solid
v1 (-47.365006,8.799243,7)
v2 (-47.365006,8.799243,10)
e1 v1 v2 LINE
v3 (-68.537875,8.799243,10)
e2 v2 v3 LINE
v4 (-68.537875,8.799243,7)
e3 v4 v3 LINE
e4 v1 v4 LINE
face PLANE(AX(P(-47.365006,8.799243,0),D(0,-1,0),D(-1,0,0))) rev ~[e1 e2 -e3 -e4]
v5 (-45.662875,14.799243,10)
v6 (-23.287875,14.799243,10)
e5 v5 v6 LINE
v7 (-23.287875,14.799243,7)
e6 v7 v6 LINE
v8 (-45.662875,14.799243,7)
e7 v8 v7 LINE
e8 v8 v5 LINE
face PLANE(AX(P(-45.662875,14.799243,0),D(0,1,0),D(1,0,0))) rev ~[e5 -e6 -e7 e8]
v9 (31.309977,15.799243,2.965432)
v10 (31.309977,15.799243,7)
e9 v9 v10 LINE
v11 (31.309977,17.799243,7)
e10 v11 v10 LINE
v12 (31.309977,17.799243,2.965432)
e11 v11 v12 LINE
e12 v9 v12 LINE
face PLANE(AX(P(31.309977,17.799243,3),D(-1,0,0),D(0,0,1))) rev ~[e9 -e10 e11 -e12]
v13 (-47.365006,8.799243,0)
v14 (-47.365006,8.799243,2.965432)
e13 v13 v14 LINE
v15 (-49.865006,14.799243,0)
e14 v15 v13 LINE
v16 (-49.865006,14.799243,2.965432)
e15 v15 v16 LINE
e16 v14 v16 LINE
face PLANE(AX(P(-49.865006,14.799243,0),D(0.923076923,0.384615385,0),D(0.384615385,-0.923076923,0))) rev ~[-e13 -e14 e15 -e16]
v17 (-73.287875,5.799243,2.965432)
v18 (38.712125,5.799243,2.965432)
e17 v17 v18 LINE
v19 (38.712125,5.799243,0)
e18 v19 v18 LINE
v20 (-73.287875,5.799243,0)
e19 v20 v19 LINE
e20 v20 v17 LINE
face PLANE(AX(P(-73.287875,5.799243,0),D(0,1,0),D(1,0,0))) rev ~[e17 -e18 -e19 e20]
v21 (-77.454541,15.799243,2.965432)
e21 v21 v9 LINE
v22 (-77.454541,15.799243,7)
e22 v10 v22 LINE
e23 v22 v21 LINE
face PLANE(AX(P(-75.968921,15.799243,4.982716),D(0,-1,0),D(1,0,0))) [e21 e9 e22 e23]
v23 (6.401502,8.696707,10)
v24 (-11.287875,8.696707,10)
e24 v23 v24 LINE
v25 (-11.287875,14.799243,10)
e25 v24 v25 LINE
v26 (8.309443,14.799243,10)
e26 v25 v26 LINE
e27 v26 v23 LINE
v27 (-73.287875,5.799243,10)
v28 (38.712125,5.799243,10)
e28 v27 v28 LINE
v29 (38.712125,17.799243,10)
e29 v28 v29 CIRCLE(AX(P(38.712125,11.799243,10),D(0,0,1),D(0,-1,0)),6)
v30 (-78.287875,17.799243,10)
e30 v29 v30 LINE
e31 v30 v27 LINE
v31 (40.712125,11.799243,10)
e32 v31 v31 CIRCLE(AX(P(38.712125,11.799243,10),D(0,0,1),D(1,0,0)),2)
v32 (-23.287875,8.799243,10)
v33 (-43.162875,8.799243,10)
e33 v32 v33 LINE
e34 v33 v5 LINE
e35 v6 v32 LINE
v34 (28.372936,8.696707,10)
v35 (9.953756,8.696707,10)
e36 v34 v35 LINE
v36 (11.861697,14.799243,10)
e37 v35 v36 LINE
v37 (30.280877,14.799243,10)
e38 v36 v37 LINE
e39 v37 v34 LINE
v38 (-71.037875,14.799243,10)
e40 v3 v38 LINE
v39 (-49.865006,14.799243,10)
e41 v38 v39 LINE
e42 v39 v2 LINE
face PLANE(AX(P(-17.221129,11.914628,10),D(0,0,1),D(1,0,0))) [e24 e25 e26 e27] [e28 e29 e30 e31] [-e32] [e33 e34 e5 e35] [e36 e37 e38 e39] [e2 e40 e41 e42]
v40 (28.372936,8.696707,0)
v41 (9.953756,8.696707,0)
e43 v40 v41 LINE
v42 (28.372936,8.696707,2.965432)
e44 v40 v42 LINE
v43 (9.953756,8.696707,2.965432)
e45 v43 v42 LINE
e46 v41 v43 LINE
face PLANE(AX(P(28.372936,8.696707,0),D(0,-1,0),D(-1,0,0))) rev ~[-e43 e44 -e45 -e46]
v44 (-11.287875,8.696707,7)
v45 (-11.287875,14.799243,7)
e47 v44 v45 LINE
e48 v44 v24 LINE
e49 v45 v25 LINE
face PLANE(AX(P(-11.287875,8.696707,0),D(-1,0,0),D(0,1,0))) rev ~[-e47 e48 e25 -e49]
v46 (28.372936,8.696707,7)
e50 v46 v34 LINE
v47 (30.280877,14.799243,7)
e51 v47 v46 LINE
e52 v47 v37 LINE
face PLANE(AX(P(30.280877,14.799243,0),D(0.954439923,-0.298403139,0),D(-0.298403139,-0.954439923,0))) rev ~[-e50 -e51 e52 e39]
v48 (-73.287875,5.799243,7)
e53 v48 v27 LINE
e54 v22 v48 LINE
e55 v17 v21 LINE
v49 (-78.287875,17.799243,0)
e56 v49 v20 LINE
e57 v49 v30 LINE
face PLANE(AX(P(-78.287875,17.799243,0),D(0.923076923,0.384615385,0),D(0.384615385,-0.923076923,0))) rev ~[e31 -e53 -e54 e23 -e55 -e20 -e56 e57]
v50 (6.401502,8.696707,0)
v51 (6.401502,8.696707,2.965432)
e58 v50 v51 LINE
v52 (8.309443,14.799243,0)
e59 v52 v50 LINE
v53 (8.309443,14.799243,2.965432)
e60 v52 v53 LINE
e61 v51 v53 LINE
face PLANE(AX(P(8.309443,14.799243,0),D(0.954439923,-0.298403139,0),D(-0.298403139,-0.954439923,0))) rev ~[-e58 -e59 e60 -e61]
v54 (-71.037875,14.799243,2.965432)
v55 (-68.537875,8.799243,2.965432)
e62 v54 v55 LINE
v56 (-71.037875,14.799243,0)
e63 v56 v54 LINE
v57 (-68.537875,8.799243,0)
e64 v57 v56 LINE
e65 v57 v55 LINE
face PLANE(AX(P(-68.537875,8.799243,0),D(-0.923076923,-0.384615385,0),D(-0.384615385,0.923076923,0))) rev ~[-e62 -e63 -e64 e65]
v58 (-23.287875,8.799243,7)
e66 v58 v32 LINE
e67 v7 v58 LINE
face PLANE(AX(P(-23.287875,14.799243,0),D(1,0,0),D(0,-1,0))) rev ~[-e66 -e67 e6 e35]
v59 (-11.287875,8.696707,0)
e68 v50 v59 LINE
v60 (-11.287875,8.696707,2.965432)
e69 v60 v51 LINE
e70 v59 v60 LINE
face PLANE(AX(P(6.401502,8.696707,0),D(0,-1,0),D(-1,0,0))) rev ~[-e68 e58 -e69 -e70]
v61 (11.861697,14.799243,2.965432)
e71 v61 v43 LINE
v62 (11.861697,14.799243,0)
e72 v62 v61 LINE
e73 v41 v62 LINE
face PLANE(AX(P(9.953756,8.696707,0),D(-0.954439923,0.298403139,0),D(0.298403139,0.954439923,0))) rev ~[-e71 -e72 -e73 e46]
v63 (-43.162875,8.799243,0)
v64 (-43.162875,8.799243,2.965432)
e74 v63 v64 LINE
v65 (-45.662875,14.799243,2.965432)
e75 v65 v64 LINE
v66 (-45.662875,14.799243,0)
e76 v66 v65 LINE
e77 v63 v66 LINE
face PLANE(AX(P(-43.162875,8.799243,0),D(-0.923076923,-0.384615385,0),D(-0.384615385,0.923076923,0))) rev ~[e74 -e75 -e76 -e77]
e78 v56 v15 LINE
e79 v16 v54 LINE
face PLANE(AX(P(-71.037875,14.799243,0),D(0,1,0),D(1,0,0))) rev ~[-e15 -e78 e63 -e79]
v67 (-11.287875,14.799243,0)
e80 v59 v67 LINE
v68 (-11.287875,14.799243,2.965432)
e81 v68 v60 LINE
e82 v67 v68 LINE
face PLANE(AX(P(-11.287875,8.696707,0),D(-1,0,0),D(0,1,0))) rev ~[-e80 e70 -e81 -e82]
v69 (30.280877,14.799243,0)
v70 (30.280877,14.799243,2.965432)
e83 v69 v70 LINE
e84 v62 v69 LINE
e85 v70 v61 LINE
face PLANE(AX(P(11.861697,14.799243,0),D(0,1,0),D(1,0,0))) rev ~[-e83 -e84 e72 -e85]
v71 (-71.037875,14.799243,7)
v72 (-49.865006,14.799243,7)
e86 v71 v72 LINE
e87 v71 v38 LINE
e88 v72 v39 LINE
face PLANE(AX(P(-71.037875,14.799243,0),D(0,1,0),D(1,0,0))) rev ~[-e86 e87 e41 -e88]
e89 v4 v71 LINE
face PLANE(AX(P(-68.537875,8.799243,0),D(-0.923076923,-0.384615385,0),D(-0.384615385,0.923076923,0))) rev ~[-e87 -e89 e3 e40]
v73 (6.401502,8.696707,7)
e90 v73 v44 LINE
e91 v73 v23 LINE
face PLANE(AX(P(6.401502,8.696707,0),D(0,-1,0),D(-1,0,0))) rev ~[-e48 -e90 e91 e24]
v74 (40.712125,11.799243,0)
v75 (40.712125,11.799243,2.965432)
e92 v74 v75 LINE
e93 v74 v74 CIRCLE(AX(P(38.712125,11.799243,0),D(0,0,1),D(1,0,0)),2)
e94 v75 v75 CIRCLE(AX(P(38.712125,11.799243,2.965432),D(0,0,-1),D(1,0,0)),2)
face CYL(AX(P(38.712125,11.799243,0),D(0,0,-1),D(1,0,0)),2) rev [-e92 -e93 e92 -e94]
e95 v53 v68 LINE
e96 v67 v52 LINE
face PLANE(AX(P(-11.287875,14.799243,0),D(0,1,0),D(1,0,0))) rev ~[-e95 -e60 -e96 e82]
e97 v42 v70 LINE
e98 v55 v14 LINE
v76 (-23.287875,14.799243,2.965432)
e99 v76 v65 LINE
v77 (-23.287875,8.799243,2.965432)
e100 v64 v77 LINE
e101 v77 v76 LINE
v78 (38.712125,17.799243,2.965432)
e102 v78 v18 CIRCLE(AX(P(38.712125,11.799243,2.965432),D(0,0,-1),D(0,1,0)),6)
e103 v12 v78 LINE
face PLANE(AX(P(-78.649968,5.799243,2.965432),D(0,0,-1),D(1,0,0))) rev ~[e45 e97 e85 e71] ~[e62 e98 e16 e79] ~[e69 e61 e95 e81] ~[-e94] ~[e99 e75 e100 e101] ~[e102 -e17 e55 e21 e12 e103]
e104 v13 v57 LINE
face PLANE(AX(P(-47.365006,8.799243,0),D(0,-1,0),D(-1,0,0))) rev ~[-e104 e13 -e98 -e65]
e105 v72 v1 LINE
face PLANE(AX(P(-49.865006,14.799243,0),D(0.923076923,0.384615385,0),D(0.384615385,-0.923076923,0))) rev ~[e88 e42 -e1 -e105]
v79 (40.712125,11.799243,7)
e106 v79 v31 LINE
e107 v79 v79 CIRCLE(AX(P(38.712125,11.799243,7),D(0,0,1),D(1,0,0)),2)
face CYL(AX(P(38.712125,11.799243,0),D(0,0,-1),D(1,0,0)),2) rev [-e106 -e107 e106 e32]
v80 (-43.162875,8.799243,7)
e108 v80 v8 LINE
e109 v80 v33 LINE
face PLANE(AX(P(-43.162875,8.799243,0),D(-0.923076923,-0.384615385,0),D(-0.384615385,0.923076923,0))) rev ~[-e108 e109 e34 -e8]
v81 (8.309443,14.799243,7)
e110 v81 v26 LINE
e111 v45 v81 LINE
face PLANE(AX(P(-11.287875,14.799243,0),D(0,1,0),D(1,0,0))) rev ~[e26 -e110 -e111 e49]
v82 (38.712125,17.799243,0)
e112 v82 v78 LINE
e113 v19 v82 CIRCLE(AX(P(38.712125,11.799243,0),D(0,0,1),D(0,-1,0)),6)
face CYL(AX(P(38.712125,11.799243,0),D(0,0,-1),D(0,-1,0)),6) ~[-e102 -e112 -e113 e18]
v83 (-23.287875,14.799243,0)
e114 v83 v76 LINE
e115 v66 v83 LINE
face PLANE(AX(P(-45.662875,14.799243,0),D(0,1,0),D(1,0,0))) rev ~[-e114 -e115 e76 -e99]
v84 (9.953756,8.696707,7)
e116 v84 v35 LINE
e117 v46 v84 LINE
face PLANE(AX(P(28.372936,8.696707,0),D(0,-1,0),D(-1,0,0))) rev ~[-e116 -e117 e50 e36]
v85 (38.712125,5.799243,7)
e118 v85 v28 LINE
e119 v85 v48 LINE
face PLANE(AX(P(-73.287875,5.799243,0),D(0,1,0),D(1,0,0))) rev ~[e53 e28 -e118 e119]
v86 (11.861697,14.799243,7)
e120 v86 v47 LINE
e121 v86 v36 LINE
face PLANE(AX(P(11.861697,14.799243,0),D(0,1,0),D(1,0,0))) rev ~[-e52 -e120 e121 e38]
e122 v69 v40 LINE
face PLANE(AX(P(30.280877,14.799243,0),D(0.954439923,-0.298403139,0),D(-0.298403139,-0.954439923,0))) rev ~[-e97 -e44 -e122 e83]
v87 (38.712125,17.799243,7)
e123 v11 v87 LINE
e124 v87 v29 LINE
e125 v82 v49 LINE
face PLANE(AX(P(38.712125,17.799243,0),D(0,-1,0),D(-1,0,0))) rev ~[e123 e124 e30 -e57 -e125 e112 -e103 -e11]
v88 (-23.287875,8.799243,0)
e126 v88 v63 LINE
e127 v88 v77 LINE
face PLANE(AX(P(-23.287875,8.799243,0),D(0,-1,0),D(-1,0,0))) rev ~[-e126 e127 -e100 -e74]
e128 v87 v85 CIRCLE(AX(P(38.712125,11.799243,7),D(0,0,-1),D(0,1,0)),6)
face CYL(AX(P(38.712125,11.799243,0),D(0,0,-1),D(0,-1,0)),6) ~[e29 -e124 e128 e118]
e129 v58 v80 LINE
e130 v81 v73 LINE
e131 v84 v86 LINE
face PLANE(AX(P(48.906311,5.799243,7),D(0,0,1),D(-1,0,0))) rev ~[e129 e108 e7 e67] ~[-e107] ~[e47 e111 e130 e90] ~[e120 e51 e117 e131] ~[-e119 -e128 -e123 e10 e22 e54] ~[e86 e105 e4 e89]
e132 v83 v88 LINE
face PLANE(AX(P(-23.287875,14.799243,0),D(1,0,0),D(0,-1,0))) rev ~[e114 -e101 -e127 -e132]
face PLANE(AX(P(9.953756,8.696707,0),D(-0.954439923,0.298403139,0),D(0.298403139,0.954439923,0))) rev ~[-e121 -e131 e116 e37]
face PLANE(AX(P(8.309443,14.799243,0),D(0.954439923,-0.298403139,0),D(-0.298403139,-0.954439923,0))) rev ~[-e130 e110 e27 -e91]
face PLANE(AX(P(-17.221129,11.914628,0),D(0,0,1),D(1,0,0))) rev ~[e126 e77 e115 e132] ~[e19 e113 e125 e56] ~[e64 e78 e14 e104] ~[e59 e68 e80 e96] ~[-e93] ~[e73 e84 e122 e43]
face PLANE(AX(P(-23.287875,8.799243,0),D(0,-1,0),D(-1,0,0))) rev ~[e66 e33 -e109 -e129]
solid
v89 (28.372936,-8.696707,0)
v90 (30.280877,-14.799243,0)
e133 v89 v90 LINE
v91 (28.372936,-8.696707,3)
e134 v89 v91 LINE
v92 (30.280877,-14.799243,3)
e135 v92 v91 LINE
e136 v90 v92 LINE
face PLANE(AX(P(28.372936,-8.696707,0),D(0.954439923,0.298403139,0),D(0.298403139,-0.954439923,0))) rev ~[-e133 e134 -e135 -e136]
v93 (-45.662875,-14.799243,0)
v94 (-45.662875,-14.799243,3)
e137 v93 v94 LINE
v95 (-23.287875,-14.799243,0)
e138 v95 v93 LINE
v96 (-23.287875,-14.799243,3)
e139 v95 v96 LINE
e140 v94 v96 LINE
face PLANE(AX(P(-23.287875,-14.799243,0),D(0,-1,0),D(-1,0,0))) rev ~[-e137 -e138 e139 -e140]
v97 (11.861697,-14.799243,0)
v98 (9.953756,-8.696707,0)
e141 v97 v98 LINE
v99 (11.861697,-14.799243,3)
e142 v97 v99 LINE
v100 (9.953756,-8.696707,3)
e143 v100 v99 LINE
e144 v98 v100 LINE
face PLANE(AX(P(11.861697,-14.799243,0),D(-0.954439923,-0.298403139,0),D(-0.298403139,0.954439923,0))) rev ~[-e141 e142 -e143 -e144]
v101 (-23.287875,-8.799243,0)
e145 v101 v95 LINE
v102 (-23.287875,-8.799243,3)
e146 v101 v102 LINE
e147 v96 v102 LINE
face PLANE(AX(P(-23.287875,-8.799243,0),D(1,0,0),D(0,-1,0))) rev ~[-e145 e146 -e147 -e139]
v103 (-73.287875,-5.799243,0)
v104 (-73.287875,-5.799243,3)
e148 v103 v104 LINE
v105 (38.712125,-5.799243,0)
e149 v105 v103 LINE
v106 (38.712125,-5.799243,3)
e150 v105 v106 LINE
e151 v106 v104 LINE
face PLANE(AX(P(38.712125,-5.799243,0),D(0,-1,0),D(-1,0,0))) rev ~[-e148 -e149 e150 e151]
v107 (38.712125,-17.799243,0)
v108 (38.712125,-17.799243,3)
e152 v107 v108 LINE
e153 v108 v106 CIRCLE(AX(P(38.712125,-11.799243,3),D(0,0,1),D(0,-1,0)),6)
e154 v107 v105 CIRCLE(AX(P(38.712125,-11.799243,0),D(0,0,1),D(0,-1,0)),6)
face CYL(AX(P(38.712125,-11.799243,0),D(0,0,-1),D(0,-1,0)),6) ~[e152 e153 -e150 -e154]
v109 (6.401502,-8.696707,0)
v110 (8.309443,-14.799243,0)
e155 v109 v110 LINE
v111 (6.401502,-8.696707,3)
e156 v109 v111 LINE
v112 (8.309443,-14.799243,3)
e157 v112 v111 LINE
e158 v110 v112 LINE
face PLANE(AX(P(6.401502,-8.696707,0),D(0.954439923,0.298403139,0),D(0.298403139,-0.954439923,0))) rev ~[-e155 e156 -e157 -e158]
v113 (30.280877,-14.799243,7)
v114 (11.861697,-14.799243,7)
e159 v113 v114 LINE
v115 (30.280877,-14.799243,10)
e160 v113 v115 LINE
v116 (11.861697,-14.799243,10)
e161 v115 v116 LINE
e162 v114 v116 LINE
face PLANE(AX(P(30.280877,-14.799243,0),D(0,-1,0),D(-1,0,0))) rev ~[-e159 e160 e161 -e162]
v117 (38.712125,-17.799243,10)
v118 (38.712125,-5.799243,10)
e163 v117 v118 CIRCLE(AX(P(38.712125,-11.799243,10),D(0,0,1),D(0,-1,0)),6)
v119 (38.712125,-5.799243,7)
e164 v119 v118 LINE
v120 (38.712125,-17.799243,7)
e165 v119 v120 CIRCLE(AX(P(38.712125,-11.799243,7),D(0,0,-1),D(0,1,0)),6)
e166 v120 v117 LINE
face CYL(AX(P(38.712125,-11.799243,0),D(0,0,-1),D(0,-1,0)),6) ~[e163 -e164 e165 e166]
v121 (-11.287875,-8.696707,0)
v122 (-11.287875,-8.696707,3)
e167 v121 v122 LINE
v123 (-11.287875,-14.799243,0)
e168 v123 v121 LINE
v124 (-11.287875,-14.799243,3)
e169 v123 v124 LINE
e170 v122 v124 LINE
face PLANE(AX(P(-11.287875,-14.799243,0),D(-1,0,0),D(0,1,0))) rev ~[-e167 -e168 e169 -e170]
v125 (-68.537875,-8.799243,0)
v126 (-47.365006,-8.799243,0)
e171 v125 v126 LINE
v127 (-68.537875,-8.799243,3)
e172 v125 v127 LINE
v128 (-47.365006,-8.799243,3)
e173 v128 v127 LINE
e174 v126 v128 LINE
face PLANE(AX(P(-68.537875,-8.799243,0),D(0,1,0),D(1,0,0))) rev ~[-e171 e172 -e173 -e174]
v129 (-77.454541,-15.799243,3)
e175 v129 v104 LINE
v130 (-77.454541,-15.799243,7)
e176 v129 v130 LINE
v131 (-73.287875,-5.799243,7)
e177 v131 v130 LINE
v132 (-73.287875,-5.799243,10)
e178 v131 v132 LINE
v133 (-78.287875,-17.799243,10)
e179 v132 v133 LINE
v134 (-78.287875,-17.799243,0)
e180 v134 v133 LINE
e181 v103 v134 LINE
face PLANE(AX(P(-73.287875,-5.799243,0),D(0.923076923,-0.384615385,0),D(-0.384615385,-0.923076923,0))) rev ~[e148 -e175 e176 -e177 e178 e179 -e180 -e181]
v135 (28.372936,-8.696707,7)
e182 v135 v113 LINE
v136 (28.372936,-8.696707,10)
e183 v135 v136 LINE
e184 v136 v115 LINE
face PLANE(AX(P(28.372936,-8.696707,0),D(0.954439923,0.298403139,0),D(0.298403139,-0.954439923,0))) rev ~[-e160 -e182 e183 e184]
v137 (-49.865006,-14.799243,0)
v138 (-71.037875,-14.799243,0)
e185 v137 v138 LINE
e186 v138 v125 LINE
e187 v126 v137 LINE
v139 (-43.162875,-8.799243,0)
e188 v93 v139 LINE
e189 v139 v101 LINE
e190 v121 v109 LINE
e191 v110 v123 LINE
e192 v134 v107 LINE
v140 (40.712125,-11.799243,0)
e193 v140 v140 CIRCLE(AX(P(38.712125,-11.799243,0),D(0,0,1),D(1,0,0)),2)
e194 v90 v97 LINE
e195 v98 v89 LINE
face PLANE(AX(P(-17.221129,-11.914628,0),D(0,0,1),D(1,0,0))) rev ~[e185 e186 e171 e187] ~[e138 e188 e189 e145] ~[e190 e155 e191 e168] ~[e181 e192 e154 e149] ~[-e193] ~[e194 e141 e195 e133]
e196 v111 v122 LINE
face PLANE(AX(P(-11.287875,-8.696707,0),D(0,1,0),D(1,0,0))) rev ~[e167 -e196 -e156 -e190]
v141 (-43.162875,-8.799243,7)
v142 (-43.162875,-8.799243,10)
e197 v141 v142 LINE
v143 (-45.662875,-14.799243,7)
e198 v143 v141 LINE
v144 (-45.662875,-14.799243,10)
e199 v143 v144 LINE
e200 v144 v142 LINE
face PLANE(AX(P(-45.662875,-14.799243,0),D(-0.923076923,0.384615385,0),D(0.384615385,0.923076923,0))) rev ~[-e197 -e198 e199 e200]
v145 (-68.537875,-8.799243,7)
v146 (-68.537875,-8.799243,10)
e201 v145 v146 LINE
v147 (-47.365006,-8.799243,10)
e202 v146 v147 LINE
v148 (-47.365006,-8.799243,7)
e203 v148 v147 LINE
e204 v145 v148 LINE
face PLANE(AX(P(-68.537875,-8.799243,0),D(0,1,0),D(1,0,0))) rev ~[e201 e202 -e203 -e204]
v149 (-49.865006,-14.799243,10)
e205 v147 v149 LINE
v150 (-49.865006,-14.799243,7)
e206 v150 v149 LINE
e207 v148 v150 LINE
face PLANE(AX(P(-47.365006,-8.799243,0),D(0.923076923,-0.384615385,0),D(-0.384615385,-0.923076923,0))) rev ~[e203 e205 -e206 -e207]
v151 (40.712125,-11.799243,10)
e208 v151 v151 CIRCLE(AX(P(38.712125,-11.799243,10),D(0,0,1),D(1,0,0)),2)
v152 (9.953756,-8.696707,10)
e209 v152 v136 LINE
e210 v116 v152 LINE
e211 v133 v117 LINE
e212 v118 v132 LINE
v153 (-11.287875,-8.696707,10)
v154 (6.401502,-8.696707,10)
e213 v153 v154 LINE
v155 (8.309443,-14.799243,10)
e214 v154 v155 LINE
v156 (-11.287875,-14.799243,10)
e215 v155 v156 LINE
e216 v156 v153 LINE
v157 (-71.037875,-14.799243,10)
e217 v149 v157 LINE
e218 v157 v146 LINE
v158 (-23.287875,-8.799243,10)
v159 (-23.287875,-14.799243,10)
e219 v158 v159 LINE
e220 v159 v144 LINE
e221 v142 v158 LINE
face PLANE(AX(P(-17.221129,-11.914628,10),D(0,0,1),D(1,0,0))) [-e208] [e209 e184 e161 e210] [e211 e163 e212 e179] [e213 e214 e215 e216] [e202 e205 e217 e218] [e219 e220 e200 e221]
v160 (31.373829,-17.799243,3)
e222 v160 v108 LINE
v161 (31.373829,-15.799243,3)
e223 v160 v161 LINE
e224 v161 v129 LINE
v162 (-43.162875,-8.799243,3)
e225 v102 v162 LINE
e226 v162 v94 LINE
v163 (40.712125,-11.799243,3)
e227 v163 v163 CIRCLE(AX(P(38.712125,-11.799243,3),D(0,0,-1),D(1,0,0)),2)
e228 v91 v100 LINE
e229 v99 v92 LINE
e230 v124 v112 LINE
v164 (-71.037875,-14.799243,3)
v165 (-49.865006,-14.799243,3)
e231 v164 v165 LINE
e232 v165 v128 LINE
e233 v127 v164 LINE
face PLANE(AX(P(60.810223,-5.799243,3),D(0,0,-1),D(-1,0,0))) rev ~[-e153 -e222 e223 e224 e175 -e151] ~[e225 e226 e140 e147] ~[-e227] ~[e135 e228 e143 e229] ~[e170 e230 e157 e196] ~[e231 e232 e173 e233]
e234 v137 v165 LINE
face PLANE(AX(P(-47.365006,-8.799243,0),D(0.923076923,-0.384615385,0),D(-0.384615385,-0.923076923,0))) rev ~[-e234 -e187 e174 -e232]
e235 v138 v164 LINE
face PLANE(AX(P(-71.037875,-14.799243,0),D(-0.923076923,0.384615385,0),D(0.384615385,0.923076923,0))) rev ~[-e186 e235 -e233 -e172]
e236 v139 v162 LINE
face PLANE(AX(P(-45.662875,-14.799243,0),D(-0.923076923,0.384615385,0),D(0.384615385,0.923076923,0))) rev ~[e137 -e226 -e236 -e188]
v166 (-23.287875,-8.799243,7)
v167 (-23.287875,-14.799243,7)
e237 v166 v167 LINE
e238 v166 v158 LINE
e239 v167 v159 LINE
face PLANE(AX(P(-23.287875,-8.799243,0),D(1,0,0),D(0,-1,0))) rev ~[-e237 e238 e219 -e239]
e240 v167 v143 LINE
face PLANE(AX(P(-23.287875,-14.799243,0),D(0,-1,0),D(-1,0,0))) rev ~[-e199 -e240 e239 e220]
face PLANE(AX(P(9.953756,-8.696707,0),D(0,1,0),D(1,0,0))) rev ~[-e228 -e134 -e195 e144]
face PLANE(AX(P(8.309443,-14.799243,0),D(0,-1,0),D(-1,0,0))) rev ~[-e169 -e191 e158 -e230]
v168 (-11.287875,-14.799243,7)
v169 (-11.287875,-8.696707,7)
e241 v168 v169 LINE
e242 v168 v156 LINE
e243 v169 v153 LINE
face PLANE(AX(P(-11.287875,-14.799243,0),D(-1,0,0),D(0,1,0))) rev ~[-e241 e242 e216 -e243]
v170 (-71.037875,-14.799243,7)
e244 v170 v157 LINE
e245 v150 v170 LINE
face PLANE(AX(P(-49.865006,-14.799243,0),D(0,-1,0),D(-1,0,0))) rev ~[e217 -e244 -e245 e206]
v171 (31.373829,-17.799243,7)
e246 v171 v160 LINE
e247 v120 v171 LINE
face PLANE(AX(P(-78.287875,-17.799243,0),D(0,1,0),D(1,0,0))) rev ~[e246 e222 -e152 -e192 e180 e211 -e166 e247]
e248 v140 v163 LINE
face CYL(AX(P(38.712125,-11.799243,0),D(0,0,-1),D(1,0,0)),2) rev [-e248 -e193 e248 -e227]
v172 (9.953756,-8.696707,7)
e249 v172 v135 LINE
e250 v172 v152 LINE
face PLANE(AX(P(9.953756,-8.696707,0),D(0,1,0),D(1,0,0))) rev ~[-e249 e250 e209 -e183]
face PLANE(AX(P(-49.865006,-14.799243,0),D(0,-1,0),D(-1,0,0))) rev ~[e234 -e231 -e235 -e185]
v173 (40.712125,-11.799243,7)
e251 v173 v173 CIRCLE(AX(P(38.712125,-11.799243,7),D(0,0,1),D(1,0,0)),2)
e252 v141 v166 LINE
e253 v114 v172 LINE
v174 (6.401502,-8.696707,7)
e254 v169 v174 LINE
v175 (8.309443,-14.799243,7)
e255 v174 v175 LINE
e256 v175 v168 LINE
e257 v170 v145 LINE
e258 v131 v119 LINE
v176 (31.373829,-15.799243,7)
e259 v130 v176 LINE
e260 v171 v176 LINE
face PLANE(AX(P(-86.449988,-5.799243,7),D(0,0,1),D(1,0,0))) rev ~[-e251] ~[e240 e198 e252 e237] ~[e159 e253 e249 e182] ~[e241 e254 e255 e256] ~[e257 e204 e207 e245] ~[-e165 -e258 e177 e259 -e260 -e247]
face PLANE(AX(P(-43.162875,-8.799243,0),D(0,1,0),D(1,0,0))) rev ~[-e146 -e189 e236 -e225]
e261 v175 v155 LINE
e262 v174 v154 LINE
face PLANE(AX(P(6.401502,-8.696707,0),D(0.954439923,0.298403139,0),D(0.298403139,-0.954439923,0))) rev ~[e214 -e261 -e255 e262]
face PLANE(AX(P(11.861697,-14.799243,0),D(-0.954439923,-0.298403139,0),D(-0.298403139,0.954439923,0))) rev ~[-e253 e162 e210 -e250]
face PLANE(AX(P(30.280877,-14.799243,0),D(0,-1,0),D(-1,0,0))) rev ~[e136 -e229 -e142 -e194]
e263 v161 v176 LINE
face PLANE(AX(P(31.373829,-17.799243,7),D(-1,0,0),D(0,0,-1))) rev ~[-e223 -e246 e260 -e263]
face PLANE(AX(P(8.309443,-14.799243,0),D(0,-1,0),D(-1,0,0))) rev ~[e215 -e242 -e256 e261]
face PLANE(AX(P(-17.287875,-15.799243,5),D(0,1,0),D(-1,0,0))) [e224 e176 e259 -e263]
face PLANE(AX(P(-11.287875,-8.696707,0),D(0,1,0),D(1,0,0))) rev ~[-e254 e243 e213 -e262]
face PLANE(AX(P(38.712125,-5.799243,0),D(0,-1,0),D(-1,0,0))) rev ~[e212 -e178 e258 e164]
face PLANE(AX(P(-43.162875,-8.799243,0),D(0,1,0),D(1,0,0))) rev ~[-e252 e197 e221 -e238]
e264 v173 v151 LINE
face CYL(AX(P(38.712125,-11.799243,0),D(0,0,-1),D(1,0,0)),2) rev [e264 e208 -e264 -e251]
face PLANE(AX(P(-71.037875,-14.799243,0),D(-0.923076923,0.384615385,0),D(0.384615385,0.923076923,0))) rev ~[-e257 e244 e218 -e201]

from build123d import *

# Parameters (mm, degrees)
F0_R      = 2
F1_DEPTH  = 10
F2_W      = 10.1941861212
F2_H      = 4.0345681068
F3_DEPTH  = 10
F4_W      = 7.5655020773
F4_H      = 4
F5_DEPTH  = 5
F6_W      = 11.8742840528
F6_H      = 0.0345681068
F7_DEPTH  = 5
F8_W      = 22.0980979502
F8_H      = 4
F9_DEPTH  = 10
F10_W     = 8.841574192
F10_H     = 4
F11_DEPTH = 5


with BuildPart() as f1:
    # F0 (on Top) → F1 (new body)
    with BuildSketch(Plane.XY):
        with BuildLine():
            Line((-73.2878747284, 5.7992432788), (38.7121252716, 5.7992432788))
            ThreePointArc((38.7121252716, 5.7992432788), (44.7121252716, 11.7992432788), (38.7121252716, 17.7992432788))
            Line((38.7121252716, 17.7992432788), (-78.2878747284, 17.7992432788))
            Line((-78.2878747284, 17.7992432788), (-73.2878747284, 5.7992432788))
        make_face()
        Polygon((-47.3650060594, 8.7992432788), (-68.5378747284, 8.7992432788), (-71.0378747284, 14.7992432788), (-49.8650060594, 14.7992432788), align=None, mode=Mode.SUBTRACT)
        Polygon((-45.6628747284, 14.7992432788), (-23.2878747284, 14.7992432788), (-23.2878747284, 8.7992432788), (-43.1628747284, 8.7992432788), align=None, mode=Mode.SUBTRACT)
        Polygon((-11.2878747284, 8.6967073874), (-11.2878747284, 14.7992432788), (8.3094434813, 14.7992432788), (6.401501639, 8.6967073874), align=None, mode=Mode.SUBTRACT)
        Polygon((9.9537555186, 8.6967073874), (11.8616973609, 14.7992432788), (30.2808774263, 14.7992432788), (28.372935584, 8.6967073874), align=None, mode=Mode.SUBTRACT)
        with Locations((38.7121252716, 11.7992432788)):
            Circle(F0_R, mode=Mode.SUBTRACT)
    extrude(amount=F1_DEPTH)

    # F2 (on face) → F3 (cut)
    with BuildSketch(Plane.XZ.offset(-5.7992432788)):
        Polygon((-73.2878747284, 2.9654318932), (-73.2878747284, 7), (-77.6094347239, 7), (-78.6499679089, 7), (-78.6499679089, 2.9654318932), align=None)
        Polygon((38.7121252716, 7), (-70.0548663735, 7), (-73.2878747284, 7), (-73.2878747284, 2.9654318932), (-72.7878747284, 2.9654318932), (38.7121252716, 2.9654318932), align=None)
        with Locations((43.8092183322, 4.9827159466)):
            Rectangle(F2_W, F2_H)
    extrude(amount=-F3_DEPTH, mode=Mode.SUBTRACT)

    # F4 (on face) → F5 (cut)
    with BuildSketch(Plane(origin=(0, 17.7992432788, 0), x_dir=(-1, 0, 0), z_dir=(0, 1, 0))):
        with Locations((-42.4948763102, 5)):
            Rectangle(F4_W, F4_H)
        Polygon((-31.3099771738, 3), (-31.3099771738, 7), (-35.9585285187, 7), (-38.7121252716, 7), (-38.7121252716, 3), (-36.1494868994, 3), align=None)
    extrude(amount=-F5_DEPTH, mode=Mode.SUBTRACT)

    # F6 (on face) → F7 (cut)
    with BuildSketch(Plane.XZ.offset(-15.7992432788)):
        with Locations((37.2471192002, 2.9827159466)):
            Rectangle(F6_W, F6_H)
    extrude(amount=-F7_DEPTH, mode=Mode.SUBTRACT)


with BuildPart() as f1b:
    # F0 (on Top) → F1, piece 2 (new body)
    with BuildSketch(Plane.XY):
        with BuildLine():
            Line((-73.2878747284, -5.7992432788), (-78.2878747284, -17.7992432788))
            Line((-78.2878747284, -17.7992432788), (38.7121252716, -17.7992432788))
            ThreePointArc((38.7121252716, -17.7992432788), (44.7121252716, -11.7992432788), (38.7121252716, -5.7992432788))
            Line((38.7121252716, -5.7992432788), (-73.2878747284, -5.7992432788))
        make_face()
        Polygon((-47.3650060594, -8.7992432788), (-49.8650060594, -14.7992432788), (-71.0378747284, -14.7992432788), (-68.5378747284, -8.7992432788), align=None, mode=Mode.SUBTRACT)
        Polygon((-23.2878747284, -14.7992432788), (-45.6628747284, -14.7992432788), (-43.1628747284, -8.7992432788), (-23.2878747284, -8.7992432788), align=None, mode=Mode.SUBTRACT)
        Polygon((8.3094434813, -14.7992432788), (-11.2878747284, -14.7992432788), (-11.2878747284, -8.6967073874), (6.401501639, -8.6967073874), align=None, mode=Mode.SUBTRACT)
        Polygon((9.9537555186, -8.6967073874), (28.372935584, -8.6967073874), (30.2808774263, -14.7992432788), (11.8616973609, -14.7992432788), align=None, mode=Mode.SUBTRACT)
        with Locations((38.7121252716, -11.7992432788)):
            Circle(F0_R, mode=Mode.SUBTRACT)
    extrude(amount=F1_DEPTH)

    # F8 (on face) → F9 (cut)
    with BuildSketch(Plane(origin=(0, -5.7992432788, 0), x_dir=(-1, 0, 0), z_dir=(0, 1, 0))):
        Polygon((73.2878747284, 7), (-36.4116951823, 7), (-38.7121252716, 7), (-38.7121252716, 3), (-35.589389503, 3), (73.2878747284, 3), align=None)
        with Locations((-49.7611742467, 5)):
            Rectangle(F8_W, F8_H)
        Polygon((86.4499881864, 7), (73.2878747284, 7), (73.2878747284, 3), (86.6957977414, 3), align=None)
    extrude(amount=-F9_DEPTH, mode=Mode.SUBTRACT)

    # F10 (on face) → F11 (cut)
    with BuildSketch(Plane.XZ.offset(17.7992432788)):
        Polygon((34.7536914051, 3), (38.7121252716, 3), (38.7121252716, 7), (34.7536914051, 7), (31.3738286495, 7), (31.3738286495, 3), align=None)
        with Locations((43.1329123676, 5)):
            Rectangle(F10_W, F10_H)
    extrude(amount=-F11_DEPTH, mode=Mode.SUBTRACT)


solid = Compound([f1.part, f1b.part])
